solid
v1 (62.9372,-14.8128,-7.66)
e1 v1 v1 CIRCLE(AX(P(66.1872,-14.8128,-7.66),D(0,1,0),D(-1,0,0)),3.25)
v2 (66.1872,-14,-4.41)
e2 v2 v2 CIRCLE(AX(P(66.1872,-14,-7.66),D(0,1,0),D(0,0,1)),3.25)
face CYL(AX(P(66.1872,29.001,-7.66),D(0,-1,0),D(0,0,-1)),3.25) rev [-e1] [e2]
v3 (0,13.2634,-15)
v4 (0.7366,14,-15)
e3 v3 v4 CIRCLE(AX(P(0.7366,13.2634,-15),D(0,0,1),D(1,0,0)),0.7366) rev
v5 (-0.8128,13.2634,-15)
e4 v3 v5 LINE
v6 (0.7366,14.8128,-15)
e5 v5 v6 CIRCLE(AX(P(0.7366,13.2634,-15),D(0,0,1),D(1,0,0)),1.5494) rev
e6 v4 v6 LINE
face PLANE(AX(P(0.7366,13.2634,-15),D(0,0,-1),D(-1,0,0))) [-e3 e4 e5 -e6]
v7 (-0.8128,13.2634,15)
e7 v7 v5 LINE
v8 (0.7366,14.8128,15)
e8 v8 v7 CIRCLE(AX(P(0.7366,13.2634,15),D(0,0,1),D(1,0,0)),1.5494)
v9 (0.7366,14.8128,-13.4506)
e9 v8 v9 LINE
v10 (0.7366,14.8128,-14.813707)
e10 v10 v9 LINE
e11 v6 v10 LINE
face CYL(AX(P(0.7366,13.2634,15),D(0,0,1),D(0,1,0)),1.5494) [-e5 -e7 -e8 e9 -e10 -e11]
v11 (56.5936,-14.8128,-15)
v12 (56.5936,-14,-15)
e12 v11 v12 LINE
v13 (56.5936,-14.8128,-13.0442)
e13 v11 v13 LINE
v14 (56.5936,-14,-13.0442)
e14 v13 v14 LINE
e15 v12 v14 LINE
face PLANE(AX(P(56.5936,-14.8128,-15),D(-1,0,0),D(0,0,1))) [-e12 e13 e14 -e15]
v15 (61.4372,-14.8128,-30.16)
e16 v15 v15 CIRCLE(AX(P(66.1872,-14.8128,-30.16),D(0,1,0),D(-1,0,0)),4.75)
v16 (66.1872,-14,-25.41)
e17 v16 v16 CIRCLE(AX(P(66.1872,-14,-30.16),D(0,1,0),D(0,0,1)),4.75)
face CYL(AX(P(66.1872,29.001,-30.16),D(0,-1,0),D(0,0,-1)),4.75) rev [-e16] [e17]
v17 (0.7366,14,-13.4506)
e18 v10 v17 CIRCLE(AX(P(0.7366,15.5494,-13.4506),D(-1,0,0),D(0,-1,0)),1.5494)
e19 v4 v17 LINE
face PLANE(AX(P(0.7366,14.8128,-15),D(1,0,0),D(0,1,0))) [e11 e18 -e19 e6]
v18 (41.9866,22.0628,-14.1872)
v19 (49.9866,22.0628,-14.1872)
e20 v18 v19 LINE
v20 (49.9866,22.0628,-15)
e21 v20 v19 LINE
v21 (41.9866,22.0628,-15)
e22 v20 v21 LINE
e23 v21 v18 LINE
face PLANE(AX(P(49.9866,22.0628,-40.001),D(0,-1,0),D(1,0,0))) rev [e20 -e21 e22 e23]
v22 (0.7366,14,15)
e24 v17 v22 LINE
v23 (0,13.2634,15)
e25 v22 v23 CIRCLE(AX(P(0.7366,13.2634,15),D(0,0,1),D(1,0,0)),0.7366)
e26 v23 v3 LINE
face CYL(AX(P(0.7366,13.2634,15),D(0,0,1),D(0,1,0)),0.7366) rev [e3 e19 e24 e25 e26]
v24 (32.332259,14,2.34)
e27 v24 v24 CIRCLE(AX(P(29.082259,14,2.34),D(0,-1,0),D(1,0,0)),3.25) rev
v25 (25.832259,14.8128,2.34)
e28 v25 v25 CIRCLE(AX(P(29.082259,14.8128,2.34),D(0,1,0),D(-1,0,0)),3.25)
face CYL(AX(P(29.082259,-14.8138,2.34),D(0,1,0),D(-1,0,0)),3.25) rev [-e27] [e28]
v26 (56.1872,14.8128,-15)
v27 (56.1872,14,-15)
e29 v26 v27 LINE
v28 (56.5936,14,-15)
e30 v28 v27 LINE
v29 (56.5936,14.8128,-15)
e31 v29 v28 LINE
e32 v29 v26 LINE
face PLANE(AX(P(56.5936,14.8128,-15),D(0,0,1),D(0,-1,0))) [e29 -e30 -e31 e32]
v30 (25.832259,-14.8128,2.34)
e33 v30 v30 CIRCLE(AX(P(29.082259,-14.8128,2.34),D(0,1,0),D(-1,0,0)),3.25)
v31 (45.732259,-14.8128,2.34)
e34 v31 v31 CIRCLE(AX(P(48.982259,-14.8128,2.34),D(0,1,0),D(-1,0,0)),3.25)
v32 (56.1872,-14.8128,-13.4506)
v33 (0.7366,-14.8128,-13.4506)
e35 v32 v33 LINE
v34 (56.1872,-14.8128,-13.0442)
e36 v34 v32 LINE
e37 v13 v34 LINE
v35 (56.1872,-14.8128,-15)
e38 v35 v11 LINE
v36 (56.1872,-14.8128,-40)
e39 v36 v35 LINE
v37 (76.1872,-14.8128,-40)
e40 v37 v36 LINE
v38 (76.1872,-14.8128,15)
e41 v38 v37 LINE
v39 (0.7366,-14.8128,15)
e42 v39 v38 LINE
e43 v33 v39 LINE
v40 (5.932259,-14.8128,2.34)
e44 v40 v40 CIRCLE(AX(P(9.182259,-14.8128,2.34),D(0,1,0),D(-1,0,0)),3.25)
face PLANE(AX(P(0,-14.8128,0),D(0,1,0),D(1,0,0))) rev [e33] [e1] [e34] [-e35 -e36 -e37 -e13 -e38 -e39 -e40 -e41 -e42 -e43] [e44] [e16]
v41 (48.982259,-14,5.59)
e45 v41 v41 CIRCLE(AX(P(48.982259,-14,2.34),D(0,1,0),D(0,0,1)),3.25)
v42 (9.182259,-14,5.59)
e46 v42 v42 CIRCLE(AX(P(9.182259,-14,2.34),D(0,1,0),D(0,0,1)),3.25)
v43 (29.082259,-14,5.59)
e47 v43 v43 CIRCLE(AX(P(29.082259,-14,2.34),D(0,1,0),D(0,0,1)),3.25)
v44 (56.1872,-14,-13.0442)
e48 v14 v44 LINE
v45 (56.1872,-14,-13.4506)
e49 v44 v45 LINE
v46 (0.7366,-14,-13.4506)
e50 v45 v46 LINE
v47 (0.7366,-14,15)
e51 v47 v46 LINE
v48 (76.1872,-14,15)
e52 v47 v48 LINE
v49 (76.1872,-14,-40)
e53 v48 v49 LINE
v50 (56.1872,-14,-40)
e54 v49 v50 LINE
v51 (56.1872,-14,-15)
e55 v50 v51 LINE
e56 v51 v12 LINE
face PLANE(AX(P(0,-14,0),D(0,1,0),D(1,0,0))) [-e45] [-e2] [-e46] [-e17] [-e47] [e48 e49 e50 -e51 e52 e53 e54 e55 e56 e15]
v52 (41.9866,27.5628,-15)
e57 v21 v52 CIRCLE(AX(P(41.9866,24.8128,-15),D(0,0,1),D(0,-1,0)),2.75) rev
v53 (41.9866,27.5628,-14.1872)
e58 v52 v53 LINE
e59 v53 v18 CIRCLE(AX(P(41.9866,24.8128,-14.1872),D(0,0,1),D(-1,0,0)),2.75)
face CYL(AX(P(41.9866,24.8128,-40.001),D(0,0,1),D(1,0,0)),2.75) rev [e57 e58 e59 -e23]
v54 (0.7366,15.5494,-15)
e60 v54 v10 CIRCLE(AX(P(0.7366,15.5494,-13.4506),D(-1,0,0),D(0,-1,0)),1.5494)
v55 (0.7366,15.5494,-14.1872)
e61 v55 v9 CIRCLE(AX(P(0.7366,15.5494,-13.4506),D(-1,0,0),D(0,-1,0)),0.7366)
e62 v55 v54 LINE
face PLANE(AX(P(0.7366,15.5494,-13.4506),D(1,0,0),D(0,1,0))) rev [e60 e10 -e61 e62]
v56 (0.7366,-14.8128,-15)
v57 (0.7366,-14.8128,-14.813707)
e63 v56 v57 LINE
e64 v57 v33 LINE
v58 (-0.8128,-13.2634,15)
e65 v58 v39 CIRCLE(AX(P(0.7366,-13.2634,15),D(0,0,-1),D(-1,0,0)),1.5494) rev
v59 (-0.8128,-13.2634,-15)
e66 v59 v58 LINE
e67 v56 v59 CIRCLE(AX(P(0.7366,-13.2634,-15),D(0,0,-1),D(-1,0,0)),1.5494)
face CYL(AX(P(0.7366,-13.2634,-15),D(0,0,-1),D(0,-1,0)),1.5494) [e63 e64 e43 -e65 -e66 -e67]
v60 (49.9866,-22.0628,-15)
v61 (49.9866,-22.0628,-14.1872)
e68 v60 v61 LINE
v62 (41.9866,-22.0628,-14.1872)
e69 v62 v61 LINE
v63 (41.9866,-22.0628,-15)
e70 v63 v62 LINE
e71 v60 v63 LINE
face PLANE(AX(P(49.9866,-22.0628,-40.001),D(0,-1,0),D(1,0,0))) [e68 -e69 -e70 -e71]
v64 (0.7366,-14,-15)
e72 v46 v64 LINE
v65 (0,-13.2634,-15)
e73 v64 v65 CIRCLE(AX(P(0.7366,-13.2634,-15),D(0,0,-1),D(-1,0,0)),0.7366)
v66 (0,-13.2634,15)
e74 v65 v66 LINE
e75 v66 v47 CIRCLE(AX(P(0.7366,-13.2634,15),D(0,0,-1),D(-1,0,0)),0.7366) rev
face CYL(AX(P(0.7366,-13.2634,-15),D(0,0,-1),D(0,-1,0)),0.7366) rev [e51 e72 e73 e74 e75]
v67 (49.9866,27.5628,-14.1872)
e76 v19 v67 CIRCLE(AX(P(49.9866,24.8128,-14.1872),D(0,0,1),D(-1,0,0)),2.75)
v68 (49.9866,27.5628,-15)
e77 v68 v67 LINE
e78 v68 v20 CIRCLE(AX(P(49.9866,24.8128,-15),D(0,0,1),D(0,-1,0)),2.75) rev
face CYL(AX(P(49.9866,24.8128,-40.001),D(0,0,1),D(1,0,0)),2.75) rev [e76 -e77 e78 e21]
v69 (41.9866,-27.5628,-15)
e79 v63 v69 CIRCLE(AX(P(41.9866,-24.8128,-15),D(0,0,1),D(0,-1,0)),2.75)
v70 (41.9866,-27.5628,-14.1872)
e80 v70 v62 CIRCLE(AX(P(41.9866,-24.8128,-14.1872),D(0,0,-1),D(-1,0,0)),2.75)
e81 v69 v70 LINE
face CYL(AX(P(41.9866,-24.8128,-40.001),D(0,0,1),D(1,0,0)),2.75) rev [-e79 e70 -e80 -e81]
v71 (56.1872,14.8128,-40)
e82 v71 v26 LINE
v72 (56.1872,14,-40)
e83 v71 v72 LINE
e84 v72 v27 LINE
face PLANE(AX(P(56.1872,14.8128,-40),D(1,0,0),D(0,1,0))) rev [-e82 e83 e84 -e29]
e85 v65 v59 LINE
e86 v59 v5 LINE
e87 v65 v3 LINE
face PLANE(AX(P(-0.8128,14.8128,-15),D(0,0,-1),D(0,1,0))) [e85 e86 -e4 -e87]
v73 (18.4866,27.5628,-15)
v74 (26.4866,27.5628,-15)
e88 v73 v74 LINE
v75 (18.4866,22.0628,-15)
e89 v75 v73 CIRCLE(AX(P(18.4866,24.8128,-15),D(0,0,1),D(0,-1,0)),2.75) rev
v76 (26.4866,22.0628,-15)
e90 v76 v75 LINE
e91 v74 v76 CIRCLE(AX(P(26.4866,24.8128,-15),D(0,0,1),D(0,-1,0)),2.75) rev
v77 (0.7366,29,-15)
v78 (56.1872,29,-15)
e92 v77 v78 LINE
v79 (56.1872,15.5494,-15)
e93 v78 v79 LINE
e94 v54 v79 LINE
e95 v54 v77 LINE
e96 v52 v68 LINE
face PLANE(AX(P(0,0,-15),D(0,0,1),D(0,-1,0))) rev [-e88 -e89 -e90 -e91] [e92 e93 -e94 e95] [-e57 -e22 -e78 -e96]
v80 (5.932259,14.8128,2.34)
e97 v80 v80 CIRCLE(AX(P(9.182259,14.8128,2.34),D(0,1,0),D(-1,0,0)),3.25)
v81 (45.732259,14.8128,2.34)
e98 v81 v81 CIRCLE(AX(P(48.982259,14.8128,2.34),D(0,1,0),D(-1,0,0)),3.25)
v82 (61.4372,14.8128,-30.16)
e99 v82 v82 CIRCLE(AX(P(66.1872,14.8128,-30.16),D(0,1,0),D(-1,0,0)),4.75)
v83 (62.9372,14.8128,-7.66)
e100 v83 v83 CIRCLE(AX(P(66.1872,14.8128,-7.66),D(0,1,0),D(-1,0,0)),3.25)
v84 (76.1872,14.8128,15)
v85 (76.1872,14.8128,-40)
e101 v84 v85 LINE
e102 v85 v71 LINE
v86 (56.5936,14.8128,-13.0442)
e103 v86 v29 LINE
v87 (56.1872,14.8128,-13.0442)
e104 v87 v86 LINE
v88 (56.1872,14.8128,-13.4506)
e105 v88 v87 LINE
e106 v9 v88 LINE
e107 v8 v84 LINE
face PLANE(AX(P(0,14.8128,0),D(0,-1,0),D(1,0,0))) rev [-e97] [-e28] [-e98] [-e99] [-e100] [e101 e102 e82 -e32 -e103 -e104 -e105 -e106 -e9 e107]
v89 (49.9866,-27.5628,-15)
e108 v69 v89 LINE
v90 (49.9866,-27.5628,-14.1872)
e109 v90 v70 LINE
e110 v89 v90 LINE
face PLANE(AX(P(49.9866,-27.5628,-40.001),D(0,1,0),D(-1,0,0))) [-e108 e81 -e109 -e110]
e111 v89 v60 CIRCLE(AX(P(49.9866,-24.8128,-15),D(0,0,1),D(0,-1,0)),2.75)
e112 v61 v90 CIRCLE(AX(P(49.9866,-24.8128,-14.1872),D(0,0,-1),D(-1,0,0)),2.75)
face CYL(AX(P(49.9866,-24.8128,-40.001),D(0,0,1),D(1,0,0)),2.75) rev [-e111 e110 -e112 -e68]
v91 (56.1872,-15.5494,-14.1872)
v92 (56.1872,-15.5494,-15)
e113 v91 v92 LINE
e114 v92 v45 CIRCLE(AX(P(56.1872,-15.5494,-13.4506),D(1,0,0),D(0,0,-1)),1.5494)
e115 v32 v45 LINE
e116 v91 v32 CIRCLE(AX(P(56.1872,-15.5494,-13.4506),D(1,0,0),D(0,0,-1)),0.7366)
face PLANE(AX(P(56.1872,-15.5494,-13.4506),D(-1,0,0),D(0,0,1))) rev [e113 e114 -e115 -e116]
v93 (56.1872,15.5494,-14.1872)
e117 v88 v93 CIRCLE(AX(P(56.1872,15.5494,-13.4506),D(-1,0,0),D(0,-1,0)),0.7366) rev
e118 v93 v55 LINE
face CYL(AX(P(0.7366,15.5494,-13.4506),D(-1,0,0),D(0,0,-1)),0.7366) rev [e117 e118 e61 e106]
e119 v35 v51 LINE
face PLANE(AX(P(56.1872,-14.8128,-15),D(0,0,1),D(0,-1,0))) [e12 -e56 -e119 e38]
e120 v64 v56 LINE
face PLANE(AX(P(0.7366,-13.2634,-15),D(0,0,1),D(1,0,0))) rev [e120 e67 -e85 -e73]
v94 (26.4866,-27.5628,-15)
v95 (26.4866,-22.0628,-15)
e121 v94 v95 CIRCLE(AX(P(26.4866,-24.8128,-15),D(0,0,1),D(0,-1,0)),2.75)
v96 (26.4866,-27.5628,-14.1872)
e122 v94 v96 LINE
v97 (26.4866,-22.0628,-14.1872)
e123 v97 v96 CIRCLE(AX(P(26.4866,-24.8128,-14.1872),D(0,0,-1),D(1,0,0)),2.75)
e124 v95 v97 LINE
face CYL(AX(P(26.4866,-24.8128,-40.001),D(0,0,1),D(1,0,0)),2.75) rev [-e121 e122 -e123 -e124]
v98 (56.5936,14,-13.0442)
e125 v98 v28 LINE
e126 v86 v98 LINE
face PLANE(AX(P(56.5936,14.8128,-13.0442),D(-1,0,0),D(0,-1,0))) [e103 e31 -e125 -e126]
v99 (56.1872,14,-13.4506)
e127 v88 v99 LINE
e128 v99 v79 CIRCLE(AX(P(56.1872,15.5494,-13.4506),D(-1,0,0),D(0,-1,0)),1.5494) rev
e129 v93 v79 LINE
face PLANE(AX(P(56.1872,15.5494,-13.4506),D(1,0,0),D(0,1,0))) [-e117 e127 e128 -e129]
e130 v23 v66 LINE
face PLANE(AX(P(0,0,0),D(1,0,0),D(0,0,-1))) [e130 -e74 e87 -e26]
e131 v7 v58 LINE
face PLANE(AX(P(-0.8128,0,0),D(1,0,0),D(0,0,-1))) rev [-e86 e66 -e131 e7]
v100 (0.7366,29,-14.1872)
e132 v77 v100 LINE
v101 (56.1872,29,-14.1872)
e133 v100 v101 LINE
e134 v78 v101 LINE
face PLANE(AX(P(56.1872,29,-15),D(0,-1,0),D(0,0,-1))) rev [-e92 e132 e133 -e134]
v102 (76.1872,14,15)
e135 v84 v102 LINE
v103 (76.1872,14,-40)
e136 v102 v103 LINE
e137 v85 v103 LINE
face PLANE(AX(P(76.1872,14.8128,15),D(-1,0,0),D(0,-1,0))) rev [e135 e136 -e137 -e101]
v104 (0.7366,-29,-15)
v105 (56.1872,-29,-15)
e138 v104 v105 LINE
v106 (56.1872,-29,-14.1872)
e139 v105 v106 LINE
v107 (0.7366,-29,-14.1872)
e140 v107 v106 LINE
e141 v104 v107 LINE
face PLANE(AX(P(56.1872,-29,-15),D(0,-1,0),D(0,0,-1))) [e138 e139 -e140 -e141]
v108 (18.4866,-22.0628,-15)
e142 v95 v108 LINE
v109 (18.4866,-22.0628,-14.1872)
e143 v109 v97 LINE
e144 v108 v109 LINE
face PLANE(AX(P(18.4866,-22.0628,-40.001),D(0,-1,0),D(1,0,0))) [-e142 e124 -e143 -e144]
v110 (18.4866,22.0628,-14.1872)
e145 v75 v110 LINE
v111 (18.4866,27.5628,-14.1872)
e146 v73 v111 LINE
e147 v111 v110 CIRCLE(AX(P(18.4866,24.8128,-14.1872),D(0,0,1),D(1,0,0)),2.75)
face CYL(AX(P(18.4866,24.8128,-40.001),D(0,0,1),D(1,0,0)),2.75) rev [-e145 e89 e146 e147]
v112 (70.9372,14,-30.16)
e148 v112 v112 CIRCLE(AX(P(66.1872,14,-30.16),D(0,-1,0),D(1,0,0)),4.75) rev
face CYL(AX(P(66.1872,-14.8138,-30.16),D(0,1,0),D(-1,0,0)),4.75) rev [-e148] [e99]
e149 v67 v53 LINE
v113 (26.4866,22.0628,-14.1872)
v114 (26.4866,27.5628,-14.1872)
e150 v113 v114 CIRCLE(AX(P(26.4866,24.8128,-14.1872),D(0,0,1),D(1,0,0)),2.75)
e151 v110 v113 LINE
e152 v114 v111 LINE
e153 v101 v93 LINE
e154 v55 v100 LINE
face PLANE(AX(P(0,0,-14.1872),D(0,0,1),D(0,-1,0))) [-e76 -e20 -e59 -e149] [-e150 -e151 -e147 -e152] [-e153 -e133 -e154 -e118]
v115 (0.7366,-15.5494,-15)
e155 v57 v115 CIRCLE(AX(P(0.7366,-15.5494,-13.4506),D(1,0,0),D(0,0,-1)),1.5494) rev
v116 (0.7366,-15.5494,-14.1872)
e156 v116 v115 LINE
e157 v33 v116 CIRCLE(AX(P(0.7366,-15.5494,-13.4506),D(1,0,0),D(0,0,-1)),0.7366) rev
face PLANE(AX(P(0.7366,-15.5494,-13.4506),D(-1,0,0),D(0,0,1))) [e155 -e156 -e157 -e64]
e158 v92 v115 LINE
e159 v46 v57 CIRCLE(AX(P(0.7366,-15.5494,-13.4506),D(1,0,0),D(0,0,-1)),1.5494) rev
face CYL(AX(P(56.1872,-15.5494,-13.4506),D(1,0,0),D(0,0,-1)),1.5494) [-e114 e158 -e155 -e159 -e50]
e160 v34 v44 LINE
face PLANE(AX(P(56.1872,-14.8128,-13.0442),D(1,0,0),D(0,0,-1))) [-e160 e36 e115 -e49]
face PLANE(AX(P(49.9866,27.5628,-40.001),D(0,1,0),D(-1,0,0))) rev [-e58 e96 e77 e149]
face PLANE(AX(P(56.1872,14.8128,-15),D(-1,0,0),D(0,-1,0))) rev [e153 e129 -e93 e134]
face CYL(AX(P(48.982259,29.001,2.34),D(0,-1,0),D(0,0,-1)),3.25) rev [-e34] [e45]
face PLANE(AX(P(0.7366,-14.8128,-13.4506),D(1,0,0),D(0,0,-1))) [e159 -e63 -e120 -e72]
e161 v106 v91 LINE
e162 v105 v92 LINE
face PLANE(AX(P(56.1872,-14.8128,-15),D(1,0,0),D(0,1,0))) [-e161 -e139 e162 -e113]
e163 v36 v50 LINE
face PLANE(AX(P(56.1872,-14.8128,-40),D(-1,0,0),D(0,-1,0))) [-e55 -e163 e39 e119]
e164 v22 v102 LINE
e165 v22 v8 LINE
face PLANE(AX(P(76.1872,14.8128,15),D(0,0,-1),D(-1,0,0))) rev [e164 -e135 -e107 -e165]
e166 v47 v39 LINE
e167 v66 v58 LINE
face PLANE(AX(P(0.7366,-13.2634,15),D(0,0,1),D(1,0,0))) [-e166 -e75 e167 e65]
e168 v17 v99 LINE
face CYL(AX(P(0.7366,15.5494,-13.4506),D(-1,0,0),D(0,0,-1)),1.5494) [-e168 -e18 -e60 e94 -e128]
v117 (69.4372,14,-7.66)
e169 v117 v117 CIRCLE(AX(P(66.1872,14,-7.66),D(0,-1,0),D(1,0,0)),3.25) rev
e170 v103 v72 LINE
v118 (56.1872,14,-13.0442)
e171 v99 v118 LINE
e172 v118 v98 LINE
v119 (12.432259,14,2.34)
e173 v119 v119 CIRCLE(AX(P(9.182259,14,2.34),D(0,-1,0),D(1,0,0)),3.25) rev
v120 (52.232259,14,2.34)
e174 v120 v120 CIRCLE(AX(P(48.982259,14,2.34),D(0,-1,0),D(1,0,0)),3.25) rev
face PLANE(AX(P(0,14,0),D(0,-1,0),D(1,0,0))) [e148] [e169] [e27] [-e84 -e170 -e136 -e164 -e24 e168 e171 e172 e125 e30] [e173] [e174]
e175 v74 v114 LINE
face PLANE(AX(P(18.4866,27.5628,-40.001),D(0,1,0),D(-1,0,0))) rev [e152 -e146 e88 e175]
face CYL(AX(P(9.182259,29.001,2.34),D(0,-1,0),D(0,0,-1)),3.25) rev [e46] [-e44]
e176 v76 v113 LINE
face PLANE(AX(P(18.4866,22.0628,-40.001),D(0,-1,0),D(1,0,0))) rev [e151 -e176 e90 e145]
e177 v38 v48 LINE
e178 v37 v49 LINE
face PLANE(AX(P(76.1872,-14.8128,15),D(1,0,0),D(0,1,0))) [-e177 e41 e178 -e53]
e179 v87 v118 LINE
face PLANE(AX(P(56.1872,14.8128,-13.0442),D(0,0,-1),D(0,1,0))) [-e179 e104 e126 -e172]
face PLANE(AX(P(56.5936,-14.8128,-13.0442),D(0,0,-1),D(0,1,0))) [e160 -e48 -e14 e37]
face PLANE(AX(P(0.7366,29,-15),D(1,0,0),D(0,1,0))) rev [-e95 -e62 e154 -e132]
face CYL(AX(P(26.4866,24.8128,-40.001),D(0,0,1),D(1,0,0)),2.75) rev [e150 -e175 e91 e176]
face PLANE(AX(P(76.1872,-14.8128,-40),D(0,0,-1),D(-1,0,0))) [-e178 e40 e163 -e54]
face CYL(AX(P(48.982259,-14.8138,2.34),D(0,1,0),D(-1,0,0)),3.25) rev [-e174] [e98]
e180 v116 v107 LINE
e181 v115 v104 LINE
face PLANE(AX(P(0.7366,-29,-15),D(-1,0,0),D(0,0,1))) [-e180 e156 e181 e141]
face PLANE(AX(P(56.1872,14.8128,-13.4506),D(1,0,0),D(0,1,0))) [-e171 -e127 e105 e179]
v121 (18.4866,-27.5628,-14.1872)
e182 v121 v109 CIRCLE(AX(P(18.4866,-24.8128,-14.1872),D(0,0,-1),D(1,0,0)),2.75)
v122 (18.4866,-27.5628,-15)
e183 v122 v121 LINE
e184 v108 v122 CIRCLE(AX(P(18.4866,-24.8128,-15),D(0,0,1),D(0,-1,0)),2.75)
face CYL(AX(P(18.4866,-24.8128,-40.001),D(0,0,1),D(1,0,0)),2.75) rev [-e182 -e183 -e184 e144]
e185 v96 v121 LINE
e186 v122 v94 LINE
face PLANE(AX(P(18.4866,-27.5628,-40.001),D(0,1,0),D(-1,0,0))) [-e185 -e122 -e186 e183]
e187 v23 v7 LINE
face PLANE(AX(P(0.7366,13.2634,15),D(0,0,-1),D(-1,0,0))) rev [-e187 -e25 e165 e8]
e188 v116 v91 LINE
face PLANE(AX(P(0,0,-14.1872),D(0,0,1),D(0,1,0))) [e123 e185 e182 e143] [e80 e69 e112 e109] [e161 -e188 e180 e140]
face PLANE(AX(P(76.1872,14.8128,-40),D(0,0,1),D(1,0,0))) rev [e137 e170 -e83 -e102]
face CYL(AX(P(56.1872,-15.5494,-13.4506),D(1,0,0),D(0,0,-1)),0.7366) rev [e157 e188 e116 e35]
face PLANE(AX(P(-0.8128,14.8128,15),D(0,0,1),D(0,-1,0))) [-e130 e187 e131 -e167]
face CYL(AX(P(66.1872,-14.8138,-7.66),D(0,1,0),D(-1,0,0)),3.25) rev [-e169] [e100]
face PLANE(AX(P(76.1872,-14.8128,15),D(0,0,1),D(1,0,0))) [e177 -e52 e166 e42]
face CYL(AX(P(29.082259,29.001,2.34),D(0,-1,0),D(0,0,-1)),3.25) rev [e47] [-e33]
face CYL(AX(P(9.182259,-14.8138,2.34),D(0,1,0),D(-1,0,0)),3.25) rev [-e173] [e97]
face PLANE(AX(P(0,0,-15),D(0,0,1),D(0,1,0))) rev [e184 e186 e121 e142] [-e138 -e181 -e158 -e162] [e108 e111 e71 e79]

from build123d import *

# Parameters (mm, degrees)
SKETCH7_W                    = 29.6256
SKETCH7_H                    = 30
BASE_FLANGE2_DEPTH           = 0.8128
EDGE_FLANGE1_STRIP_W         = 4.7244
EDGE_FLANGE1_STRIP_H         = 0.8128
EDGE_FLANGE1_STRIP_CUT_DEPTH = 30
EDGE_FLANGE1_DEPTH           = 30
EDGE_FLANGE1_FLAT_DEPTH      = 0.8128
EDGE_FLANGE3_START           = 0.7366
EDGE_FLANGE3_DEPTH           = 55.857
EDGE_FLANGE3_START_2         = 56.1872
EDGE_FLANGE3_2_DEPTH         = 0.4064
EDGE_FLANGE3_3_DEPTH         = 55.4506
CUT_EXTRUDE1_REACH           = 93.006
SKETCH21_R                   = 4.75
SKETCH21_R_2                 = 3.25
CUT_EXTRUDE2_REACH           = 88.587


# Read off the part's stored shape, not the designer's step: Edge-Flange3
# Sheet-metal steps are written as plain solids
with BuildPart() as part:
    # Sketch7 → Base-Flange2 (new body)
    with BuildSketch(Plane.YZ):
        Rectangle(SKETCH7_W, SKETCH7_H)
    extrude(amount=-BASE_FLANGE2_DEPTH)

    # Edge-Flange1 strip (across the edge) → Edge-Flange1 strip cut (cut)
    with BuildSketch(Plane(origin=(0, 14.8128, -15), x_dir=(0, -1, 0), z_dir=(0, 0, 1))):
        with Locations((-0.8128, -0.4064)):
            Rectangle(EDGE_FLANGE1_STRIP_W, EDGE_FLANGE1_STRIP_H)
    edge_flange1_strip_cut = extrude(amount=EDGE_FLANGE1_STRIP_CUT_DEPTH, mode=Mode.SUBTRACT)

    # Edge-Flange1 bend section (across the edge) → Edge-Flange1 (add)
    with BuildSketch(Plane(origin=(0, 14.8128, -15), x_dir=(0, -1, 0), z_dir=(0, 0, 1))):
        with BuildLine():
            Line((0, 0.7366), (0.8128, 0.7366))
            ThreePointArc((0.8128, 0.7366), (1.028545145, 0.215745145), (1.5494, 0))
            Line((1.5494, 0), (1.5494, -0.8128))
            ThreePointArc((1.5494, -0.8128), (0.453808753, -0.358991247), (0, 0.7366))
        make_face()
    edge_flange1 = extrude(amount=EDGE_FLANGE1_DEPTH)

    # Edge-Flange1 profile (on flange) → Edge-Flange1 flat (add)
    with BuildSketch(Plane.ZX.offset(14.8128)):
        Polygon((-40, 56.1872), (-15, 56.1872), (-15, 0.7366), (15, 0.7366), (15, 76.1872), (-40, 76.1872), align=None)
    edge_flange1_flat = extrude(amount=-EDGE_FLANGE1_FLAT_DEPTH)

    # Edge-Flange3 outline → Edge-Flange3 (cut)
    with BuildSketch(Plane.YZ.offset(EDGE_FLANGE3_START)):
        with BuildLine():
            Line((14.8128, -15), (14.8128, -14.813707039))
            ThreePointArc((14.8128, -14.813707039), (14.218624211, -14.244121367), (14, -13.4506))
            Line((14, -13.4506), (14, -15))
            Line((14, -15), (14.8128, -15))
        make_face()
    edge_flange3 = extrude(amount=EDGE_FLANGE3_DEPTH, mode=Mode.SUBTRACT)

    # Edge-Flange3 2 outline → Edge-Flange3 2 (cut)
    with BuildSketch(Plane.YZ.offset(EDGE_FLANGE3_START_2)):
        with BuildLine():
            ThreePointArc((14, -13.4506), (14.218624211, -14.244121367), (14.8128, -14.813707039))
            Line((14.8128, -14.813707039), (14.8128, -13.0442))
            Line((14.8128, -13.0442), (14, -13.0442))
            Line((14, -13.0442), (14, -13.4506))
        make_face()
    edge_flange3_2 = extrude(amount=EDGE_FLANGE3_2_DEPTH, mode=Mode.SUBTRACT)

    # Edge-Flange3 3 outline → Edge-Flange3 3 (add)
    with BuildSketch(Plane.YZ.offset(EDGE_FLANGE3_START)):
        with BuildLine():
            Line((15.5494, -15), (29, -15))
            Line((29, -15), (29, -14.1872))
            Line((29, -14.1872), (15.5494, -14.1872))
            ThreePointArc((15.5494, -14.1872), (15.028545145, -13.971454855), (14.8128, -13.4506))
            Line((14.8128, -13.4506), (14.8128, -14.813707039))
            ThreePointArc((14.8128, -14.813707039), (15.169503755, -14.952704924), (15.5494, -15))
        make_face()
    edge_flange3_3 = extrude(amount=EDGE_FLANGE3_3_DEPTH)

    # Sketch21 → Cut-Extrude1 (cut, up to next)
    with BuildSketch(Plane(origin=(0, 14.8128, 0), x_dir=(-1, 0, 0), z_dir=(0, 1, 0)), mode=Mode.PRIVATE) as cut_extrude1_sk1:
        with Locations((-66.1872, -30.16)):
            Circle(SKETCH21_R)
    cut_extrude1_tool1 = extrude(cut_extrude1_sk1.sketch, amount=-CUT_EXTRUDE1_REACH, mode=Mode.PRIVATE) & part.part
    # Sketch21 → Cut-Extrude1 (cut, up to next)
    with BuildSketch(Plane(origin=(0, 14.8128, 0), x_dir=(-1, 0, 0), z_dir=(0, 1, 0)), mode=Mode.PRIVATE) as cut_extrude1_sk2:
        with Locations((-66.1872, -7.66)):
            Circle(SKETCH21_R_2)
    cut_extrude1_tool2 = extrude(cut_extrude1_sk2.sketch, amount=-CUT_EXTRUDE1_REACH, mode=Mode.PRIVATE) & part.part
    # Sketch21 → Cut-Extrude1 (cut, up to next)
    with BuildSketch(Plane(origin=(0, 14.8128, 0), x_dir=(-1, 0, 0), z_dir=(0, 1, 0)), mode=Mode.PRIVATE) as cut_extrude1_sk3:
        with Locations((-48.982258849, 2.34)):
            Circle(SKETCH21_R_2)
    cut_extrude1_tool3 = extrude(cut_extrude1_sk3.sketch, amount=-CUT_EXTRUDE1_REACH, mode=Mode.PRIVATE) & part.part
    # Sketch21 → Cut-Extrude1 (cut, up to next)
    with BuildSketch(Plane(origin=(0, 14.8128, 0), x_dir=(-1, 0, 0), z_dir=(0, 1, 0)), mode=Mode.PRIVATE) as cut_extrude1_sk4:
        with Locations((-29.082258849, 2.34)):
            Circle(SKETCH21_R_2)
    cut_extrude1_tool4 = extrude(cut_extrude1_sk4.sketch, amount=-CUT_EXTRUDE1_REACH, mode=Mode.PRIVATE) & part.part
    # Sketch21 → Cut-Extrude1 (cut, up to next)
    with BuildSketch(Plane(origin=(0, 14.8128, 0), x_dir=(-1, 0, 0), z_dir=(0, 1, 0)), mode=Mode.PRIVATE) as cut_extrude1_sk5:
        with Locations((-9.182258849, 2.34)):
            Circle(SKETCH21_R_2)
    cut_extrude1_tool5 = extrude(cut_extrude1_sk5.sketch, amount=-CUT_EXTRUDE1_REACH, mode=Mode.PRIVATE) & part.part
    cut_extrude1_1 = cut_extrude1_tool1.solids().sort_by_distance((66.1872, 14.8128, -30.16))[0]
    add(cut_extrude1_1, mode=Mode.SUBTRACT)
    cut_extrude1_2 = cut_extrude1_tool2.solids().sort_by_distance((66.1872, 14.8128, -7.66))[0]
    add(cut_extrude1_2, mode=Mode.SUBTRACT)
    cut_extrude1_3 = cut_extrude1_tool3.solids().sort_by_distance((48.982259, 14.8128, 2.34))[0]
    add(cut_extrude1_3, mode=Mode.SUBTRACT)
    cut_extrude1_4 = cut_extrude1_tool4.solids().sort_by_distance((29.082259, 14.8128, 2.34))[0]
    add(cut_extrude1_4, mode=Mode.SUBTRACT)
    cut_extrude1_5 = cut_extrude1_tool5.solids().sort_by_distance((9.182259, 14.8128, 2.34))[0]
    add(cut_extrude1_5, mode=Mode.SUBTRACT)
    cut_extrude1 = cut_extrude1_1 + cut_extrude1_2 + cut_extrude1_3 + cut_extrude1_4 + cut_extrude1_5  # Cut-Extrude1 as one shape, for the pattern or mirror that repeats it

    # Sketch22 → Cut-Extrude2 (cut, up to next)
    with BuildSketch(Plane.XY.offset(-14.1872), mode=Mode.PRIVATE) as cut_extrude2_sk1:
        with BuildLine():
            Line((18.4866, 27.5628), (26.4866, 27.5628))
            ThreePointArc((26.4866, 27.5628), (29.2366, 24.8128), (26.4866, 22.0628))
            Line((26.4866, 22.0628), (18.4866, 22.0628))
            ThreePointArc((18.4866, 22.0628), (15.7366, 24.8128), (18.4866, 27.5628))
        make_face()
    cut_extrude2_tool1 = extrude(cut_extrude2_sk1.sketch, amount=-CUT_EXTRUDE2_REACH, mode=Mode.PRIVATE) & part.part
    # Sketch22 → Cut-Extrude2 (cut, up to next)
    with BuildSketch(Plane.XY.offset(-14.1872), mode=Mode.PRIVATE) as cut_extrude2_sk2:
        with BuildLine():
            Line((49.9866, 27.5628), (41.9866, 27.5628))
            ThreePointArc((41.9866, 27.5628), (39.2366, 24.8128), (41.9866, 22.0628))
            Line((41.9866, 22.0628), (49.9866, 22.0628))
            ThreePointArc((49.9866, 22.0628), (52.7366, 24.8128), (49.9866, 27.5628))
        make_face()
    cut_extrude2_tool2 = extrude(cut_extrude2_sk2.sketch, amount=-CUT_EXTRUDE2_REACH, mode=Mode.PRIVATE) & part.part
    cut_extrude2_1 = cut_extrude2_tool1.solids().sort_by_distance((22.4866, 24.8128, -14.1872))[0]
    add(cut_extrude2_1, mode=Mode.SUBTRACT)
    cut_extrude2_2 = cut_extrude2_tool2.solids().sort_by_distance((45.9866, 24.8128, -14.1872))[0]
    add(cut_extrude2_2, mode=Mode.SUBTRACT)
    cut_extrude2 = cut_extrude2_1 + cut_extrude2_2  # Cut-Extrude2 as one shape, for the pattern or mirror that repeats it

    # Mirror1: Edge-Flange1 strip cut, Edge-Flange1, Edge-Flange1 flat, Edge-Flange3, Edge-Flange3 2, Edge-Flange3 3, Cut-Extrude1, Cut-Extrude2 across plane
    add(edge_flange1_strip_cut.mirror(Plane.ZX), mode=Mode.SUBTRACT)
    add(edge_flange1.mirror(Plane.ZX))
    add(edge_flange1_flat.mirror(Plane.ZX))
    add(edge_flange3.mirror(Plane.ZX), mode=Mode.SUBTRACT)
    add(edge_flange3_2.mirror(Plane.ZX), mode=Mode.SUBTRACT)
    add(edge_flange3_3.mirror(Plane.ZX))
    add(cut_extrude1.mirror(Plane.ZX), mode=Mode.SUBTRACT)
    add(cut_extrude2.mirror(Plane.ZX), mode=Mode.SUBTRACT)


solid = part.part
